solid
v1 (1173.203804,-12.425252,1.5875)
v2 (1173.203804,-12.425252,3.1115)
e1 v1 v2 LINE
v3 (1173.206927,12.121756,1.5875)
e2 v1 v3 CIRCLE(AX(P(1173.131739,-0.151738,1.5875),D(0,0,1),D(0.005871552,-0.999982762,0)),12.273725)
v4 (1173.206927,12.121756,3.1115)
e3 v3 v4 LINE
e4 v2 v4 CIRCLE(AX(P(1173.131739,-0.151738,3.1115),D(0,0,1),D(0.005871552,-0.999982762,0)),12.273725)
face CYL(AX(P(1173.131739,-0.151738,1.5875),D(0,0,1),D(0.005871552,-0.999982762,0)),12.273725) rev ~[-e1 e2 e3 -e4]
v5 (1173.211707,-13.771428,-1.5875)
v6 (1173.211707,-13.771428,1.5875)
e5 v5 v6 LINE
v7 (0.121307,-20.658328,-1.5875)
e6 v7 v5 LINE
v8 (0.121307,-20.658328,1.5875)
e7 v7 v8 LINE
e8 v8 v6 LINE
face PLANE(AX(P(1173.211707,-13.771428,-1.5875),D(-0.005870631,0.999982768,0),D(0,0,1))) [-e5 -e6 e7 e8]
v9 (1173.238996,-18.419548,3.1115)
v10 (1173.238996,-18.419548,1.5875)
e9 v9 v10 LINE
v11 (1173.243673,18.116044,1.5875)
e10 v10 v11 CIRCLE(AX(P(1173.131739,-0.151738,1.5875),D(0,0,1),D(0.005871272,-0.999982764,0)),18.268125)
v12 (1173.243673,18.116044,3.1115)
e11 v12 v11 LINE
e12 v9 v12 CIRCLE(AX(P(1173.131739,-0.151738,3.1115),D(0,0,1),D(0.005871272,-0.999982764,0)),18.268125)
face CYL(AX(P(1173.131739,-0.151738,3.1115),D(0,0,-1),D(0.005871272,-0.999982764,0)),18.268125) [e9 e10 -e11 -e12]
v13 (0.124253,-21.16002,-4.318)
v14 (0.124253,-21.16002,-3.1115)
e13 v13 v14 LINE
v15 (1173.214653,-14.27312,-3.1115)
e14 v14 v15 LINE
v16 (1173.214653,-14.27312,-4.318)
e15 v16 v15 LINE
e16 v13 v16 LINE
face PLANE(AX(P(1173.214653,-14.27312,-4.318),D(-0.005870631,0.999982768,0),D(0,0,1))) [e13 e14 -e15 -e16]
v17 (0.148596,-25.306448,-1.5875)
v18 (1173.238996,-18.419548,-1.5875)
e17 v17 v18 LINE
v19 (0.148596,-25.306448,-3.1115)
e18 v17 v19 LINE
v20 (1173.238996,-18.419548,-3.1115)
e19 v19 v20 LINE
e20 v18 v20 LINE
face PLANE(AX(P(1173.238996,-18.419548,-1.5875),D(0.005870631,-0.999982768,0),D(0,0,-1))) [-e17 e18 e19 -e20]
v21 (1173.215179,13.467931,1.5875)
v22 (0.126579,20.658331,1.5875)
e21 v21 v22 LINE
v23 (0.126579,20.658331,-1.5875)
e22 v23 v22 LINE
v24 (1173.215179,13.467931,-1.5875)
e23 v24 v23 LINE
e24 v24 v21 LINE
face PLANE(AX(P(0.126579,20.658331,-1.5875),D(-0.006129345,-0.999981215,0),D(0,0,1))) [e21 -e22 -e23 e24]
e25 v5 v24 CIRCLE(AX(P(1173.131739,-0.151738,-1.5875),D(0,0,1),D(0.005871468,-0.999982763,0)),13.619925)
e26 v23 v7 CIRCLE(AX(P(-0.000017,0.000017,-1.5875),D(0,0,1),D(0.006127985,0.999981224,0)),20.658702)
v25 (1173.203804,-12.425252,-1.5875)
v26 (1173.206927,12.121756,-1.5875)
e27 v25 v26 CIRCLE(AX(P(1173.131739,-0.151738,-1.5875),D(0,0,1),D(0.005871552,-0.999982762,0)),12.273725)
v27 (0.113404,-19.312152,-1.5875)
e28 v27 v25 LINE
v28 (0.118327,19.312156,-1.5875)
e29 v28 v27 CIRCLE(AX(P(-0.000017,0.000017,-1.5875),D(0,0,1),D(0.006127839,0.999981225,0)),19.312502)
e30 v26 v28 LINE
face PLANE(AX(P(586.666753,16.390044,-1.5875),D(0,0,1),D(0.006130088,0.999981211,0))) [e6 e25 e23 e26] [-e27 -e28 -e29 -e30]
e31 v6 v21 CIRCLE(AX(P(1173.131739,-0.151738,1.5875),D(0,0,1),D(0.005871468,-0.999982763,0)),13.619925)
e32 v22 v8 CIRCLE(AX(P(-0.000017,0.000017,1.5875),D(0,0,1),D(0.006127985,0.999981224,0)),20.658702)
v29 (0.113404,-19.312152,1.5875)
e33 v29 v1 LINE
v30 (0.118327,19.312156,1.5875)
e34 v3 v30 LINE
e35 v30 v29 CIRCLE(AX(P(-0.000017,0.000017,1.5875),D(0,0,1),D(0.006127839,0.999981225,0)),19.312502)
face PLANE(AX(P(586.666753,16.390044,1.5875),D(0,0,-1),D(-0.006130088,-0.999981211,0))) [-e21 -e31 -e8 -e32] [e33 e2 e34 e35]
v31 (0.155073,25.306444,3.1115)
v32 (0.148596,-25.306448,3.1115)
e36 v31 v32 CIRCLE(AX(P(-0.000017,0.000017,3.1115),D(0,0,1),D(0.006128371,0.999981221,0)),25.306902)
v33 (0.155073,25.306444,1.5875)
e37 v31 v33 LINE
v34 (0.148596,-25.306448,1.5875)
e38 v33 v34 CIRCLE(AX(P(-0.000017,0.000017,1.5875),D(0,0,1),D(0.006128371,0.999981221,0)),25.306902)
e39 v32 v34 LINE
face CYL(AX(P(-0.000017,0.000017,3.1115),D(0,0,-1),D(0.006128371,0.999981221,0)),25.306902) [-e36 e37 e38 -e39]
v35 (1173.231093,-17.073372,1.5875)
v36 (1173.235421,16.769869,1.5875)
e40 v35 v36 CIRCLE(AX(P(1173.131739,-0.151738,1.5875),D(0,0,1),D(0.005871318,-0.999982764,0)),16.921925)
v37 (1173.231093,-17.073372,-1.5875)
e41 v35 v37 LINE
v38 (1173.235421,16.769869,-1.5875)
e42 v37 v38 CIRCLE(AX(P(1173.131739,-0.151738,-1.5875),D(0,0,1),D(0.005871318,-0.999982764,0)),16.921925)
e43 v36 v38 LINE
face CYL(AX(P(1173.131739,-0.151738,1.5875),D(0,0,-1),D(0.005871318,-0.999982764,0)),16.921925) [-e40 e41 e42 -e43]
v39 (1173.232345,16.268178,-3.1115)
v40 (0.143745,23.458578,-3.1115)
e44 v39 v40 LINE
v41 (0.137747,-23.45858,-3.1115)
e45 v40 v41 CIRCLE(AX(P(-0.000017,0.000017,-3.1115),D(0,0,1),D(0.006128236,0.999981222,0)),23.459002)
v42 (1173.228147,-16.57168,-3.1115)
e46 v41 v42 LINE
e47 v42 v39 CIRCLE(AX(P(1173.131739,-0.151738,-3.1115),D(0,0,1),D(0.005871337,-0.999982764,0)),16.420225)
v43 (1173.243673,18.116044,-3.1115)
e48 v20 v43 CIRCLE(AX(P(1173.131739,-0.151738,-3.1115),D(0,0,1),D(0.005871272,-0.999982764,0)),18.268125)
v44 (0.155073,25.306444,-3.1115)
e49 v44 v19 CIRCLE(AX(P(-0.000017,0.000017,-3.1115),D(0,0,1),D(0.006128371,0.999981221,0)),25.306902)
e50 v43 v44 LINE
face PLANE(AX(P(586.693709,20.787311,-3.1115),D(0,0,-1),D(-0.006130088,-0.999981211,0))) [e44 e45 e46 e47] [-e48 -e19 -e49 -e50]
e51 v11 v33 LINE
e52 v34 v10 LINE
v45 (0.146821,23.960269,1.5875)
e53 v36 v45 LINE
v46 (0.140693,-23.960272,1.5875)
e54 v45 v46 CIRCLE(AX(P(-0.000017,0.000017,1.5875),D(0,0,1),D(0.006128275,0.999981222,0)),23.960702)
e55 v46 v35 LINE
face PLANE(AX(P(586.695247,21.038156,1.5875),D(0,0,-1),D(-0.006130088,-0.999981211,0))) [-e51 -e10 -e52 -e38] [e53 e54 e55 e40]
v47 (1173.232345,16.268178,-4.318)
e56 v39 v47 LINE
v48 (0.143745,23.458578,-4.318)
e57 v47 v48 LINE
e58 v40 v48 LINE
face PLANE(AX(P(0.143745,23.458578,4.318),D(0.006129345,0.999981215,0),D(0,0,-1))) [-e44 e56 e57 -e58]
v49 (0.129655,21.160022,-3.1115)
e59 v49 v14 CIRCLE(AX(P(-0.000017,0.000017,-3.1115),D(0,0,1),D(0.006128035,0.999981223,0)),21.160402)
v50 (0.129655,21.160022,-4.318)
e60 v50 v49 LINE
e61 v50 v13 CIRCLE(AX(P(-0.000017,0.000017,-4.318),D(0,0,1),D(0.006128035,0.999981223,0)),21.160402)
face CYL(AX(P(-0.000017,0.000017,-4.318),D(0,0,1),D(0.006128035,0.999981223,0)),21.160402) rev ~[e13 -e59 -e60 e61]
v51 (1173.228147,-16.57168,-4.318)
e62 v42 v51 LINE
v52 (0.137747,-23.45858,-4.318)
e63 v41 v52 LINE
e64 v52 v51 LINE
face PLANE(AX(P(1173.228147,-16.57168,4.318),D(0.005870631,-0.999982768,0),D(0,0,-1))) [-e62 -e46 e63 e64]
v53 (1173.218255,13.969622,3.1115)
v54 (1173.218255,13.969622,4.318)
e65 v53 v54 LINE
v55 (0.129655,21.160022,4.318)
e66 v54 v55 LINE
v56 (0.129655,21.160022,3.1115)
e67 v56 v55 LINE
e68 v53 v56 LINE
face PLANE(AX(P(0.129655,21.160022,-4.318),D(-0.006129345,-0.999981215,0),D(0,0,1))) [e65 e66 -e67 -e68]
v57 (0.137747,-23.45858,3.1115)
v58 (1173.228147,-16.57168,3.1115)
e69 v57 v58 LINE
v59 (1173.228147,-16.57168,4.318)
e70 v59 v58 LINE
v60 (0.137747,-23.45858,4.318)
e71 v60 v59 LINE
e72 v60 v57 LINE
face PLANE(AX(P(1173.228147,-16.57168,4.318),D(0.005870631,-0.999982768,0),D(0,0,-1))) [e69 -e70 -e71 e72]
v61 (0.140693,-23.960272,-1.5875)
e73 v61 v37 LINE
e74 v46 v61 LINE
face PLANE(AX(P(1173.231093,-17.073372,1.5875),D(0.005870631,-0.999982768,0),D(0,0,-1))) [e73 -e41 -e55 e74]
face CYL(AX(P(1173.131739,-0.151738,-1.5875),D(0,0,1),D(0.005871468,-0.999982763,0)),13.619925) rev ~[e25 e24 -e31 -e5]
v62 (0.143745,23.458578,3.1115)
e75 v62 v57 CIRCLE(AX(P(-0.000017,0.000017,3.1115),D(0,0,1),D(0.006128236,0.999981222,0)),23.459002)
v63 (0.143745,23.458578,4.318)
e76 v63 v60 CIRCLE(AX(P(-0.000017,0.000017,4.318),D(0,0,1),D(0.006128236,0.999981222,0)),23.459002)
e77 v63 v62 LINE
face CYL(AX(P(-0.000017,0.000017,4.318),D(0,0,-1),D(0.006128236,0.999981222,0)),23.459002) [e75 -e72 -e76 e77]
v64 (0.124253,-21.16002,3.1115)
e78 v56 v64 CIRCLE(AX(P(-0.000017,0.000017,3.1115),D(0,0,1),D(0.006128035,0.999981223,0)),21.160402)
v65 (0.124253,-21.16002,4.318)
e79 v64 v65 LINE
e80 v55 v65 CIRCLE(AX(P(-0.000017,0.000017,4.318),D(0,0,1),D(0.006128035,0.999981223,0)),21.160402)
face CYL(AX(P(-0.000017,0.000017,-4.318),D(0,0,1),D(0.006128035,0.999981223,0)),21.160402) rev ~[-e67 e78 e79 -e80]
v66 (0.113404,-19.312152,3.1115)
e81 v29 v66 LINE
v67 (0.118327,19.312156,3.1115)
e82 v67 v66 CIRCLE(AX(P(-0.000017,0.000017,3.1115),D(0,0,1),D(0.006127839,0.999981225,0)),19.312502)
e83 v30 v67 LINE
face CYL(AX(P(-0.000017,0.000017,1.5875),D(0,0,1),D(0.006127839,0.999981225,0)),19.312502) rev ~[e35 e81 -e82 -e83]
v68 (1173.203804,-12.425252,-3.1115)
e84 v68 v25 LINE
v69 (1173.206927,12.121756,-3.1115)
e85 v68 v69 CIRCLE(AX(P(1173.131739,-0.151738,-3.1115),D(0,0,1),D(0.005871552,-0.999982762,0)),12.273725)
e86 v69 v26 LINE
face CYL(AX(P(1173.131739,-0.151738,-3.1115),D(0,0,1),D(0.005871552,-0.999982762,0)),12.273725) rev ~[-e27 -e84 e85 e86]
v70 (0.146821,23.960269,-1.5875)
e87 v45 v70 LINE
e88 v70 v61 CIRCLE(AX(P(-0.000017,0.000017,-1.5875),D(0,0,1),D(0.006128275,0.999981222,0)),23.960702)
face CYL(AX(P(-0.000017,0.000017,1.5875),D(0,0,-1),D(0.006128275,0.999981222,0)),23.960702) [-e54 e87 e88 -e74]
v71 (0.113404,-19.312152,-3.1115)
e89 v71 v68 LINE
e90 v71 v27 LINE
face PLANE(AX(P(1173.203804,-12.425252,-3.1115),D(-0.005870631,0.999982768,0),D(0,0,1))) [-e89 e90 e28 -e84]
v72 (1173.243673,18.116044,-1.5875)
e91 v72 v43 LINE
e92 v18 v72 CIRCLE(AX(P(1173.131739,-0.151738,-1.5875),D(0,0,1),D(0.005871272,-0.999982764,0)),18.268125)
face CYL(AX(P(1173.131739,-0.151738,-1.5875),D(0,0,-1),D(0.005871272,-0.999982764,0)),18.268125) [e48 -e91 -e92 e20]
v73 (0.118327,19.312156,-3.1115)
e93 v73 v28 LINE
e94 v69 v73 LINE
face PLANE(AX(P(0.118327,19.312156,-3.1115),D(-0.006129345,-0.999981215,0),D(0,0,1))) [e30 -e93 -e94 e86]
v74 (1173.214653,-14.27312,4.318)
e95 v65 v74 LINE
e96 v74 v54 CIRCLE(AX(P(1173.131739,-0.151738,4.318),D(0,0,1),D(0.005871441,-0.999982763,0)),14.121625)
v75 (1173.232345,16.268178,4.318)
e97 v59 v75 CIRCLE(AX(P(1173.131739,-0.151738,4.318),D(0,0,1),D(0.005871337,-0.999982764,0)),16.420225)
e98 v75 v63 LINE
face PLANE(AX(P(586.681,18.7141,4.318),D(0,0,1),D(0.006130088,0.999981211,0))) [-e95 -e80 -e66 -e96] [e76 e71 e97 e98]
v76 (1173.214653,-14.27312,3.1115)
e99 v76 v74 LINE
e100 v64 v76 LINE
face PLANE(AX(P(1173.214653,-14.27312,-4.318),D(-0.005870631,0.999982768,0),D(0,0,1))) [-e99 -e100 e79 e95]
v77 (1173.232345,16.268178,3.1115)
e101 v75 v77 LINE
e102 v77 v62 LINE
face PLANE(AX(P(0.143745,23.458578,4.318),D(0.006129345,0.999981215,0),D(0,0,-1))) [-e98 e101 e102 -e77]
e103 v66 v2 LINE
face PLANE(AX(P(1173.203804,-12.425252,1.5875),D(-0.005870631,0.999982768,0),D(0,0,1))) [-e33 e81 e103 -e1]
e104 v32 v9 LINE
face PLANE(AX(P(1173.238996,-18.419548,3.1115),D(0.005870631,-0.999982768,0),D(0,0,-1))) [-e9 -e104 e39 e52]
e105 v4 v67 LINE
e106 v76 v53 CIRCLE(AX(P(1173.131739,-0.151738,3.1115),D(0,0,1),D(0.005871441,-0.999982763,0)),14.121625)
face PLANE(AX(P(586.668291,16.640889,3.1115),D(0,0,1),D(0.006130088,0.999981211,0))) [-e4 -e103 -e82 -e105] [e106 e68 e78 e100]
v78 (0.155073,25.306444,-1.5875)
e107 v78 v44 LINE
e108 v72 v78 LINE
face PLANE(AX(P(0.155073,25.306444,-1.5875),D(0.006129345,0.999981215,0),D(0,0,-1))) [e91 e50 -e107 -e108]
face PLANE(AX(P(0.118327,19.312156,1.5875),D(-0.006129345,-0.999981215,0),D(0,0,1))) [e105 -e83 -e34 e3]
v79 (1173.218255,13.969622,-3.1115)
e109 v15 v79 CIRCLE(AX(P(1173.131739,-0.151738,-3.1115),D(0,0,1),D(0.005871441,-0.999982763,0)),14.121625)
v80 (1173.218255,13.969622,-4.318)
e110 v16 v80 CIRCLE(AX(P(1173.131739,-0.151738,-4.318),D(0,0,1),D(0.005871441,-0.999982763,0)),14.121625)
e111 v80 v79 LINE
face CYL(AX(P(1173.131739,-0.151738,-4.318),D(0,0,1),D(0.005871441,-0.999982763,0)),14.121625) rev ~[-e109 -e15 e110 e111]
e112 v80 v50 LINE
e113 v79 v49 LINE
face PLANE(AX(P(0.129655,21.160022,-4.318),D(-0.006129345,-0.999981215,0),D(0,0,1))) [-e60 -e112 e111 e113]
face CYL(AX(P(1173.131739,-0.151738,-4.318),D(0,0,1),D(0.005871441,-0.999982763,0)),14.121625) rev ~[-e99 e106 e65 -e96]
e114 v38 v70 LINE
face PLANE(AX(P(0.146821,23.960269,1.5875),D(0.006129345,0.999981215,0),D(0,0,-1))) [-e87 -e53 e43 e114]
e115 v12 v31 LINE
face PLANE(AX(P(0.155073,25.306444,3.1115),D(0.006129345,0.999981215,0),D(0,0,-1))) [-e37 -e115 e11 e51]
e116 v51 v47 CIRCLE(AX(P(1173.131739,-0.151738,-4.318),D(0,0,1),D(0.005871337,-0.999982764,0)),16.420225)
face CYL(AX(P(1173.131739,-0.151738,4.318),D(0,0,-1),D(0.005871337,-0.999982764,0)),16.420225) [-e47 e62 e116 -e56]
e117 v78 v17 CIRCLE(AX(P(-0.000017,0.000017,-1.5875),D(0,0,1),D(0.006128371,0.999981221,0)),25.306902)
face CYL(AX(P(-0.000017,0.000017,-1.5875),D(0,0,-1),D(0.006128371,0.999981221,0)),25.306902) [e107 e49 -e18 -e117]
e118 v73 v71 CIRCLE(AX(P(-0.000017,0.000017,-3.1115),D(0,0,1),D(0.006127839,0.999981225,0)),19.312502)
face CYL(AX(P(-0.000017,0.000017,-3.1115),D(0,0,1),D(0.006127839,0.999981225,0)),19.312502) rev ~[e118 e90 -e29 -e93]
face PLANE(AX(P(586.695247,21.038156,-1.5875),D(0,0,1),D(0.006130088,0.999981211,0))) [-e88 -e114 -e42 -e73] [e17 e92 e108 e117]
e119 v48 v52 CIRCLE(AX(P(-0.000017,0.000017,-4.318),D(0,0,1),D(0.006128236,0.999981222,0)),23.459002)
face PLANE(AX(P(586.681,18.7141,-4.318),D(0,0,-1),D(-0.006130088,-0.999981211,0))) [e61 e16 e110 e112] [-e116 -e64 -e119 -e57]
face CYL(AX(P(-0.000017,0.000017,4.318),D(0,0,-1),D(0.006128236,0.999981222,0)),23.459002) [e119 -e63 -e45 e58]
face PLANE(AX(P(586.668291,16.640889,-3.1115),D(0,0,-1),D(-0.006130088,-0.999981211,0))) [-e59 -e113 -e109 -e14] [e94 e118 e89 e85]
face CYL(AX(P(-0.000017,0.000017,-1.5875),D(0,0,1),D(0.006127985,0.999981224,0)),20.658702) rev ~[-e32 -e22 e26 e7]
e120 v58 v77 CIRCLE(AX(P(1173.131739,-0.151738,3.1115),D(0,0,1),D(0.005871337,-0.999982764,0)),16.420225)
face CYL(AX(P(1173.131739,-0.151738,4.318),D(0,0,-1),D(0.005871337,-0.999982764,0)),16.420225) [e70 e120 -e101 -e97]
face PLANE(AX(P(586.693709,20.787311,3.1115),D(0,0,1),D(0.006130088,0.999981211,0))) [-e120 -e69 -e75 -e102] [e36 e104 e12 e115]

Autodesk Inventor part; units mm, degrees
ref_plane "Work Plane2" through (0, 0, 0) normal (-1, 0, 0) x (0, 0, 1)
ref_plane "Work Plane3" through (1173.1317, -0.1517, 0) normal (-0.9945282, 0.1044685, 0) x (0, 0, 1)
sketch "Path" plane through (0, 0, 0) normal (0, 0, 1) x (1, 0, 0)
  arc A0 (0.1367, 22.3093) -> (0.131, -22.3093) centre (0, 0) ccw
  arc A1 (1173.2214, -15.4224) -> (1173.2253, 15.1189) centre (1173.1317, -0.1517) ccw
  line L0 (1173.2214, -15.4224) -> (0.131, -22.3093)
  line L1 (0.1367, 22.3093) -> (1173.2253, 15.1189)
  dimension "d31" = 5.9944
ref_plane "Section Plane" through (0.131, -22.3093, 0) normal (0.9999828, 0.0058707, 0) x (0, 0, 1)
sketch "Section Sketch" plane through (0.131, -22.3093, 0) normal (0.9999828, 0.0058707, 0) x (0, 0, 1)
  line L0 (-4.318, -1.1493) -> (4.318, -1.1493)
  line L1 (4.318, -1.1493) -> (4.318, 1.1493)
  line L2 (4.318, 1.1493) -> (-4.318, 1.1493)
  line L3 (-4.318, 1.1493) -> (-4.318, -1.1493)
  line L4 (-1.5875, -1.651) -> (1.5875, -1.651)
  line L5 (1.5875, -1.651) -> (1.5875, 1.651)
  line L6 (1.5875, 1.651) -> (-1.5875, 1.651)
  line L7 (-1.5875, 1.651) -> (-1.5875, -1.651)
  line L8 (-1.5875, 0) -> (1.5875, 0) construction
  line L9 (-3.1115, -2.9972) -> (-1.5875, -2.9972)
  line L10 (-1.5875, -2.9972) -> (-1.5875, 2.9972)
  line L11 (-1.5875, 2.9972) -> (-3.1115, 2.9972)
  line L12 (-3.1115, 2.9972) -> (-3.1115, -2.9972)
  line L13 (1.5875, -2.9972) -> (3.1115, -2.9972)
  line L14 (3.1115, -2.9972) -> (3.1115, 2.9972)
  line L15 (3.1115, 2.9972) -> (1.5875, 2.9972)
  line L16 (1.5875, 2.9972) -> (1.5875, -2.9972)
  line L17 (-4.318, 0) -> (4.318, 0) construction
  point P0 (0, 0)
  point P1 (0, 0)
  dimension "d21" = 2.2987
  dimension "d22" = 3.302
  dimension "d23" = 3.175
  dimension "d24" = 1.524
  dimension "d31" = 5.9944
  dimension "d32" = 8.636
sweep "Solid" add profiles "Section Sketch" path "Path"
pattern_of_one "Strand Pattern"
equation "\"d21\" = da_d2"
equation "\"d22\" = da_d1"
equation "\"d23\" = da_b1"
equation "\"d24\" = da_t1 + da_t2"
equation "\"d30\" = da_pt"
equation "\"da_p\" = 6.35"
equation "\"da_b1\" = 3.175"
equation "\"da_h2\" = 5.9944"
equation "\"da_h3\" = 5.207"
equation "\"da_d1\" = 3.302"
equation "\"da_d2\" = 2.2987"
equation "\"da_pt\" = 6.4008"
equation "\"da_b\" = 8.636"
equation "\"da_t1\" = 0.762"
equation "\"da_t2\" = 0.762"
properties part number "Roller Chain"
